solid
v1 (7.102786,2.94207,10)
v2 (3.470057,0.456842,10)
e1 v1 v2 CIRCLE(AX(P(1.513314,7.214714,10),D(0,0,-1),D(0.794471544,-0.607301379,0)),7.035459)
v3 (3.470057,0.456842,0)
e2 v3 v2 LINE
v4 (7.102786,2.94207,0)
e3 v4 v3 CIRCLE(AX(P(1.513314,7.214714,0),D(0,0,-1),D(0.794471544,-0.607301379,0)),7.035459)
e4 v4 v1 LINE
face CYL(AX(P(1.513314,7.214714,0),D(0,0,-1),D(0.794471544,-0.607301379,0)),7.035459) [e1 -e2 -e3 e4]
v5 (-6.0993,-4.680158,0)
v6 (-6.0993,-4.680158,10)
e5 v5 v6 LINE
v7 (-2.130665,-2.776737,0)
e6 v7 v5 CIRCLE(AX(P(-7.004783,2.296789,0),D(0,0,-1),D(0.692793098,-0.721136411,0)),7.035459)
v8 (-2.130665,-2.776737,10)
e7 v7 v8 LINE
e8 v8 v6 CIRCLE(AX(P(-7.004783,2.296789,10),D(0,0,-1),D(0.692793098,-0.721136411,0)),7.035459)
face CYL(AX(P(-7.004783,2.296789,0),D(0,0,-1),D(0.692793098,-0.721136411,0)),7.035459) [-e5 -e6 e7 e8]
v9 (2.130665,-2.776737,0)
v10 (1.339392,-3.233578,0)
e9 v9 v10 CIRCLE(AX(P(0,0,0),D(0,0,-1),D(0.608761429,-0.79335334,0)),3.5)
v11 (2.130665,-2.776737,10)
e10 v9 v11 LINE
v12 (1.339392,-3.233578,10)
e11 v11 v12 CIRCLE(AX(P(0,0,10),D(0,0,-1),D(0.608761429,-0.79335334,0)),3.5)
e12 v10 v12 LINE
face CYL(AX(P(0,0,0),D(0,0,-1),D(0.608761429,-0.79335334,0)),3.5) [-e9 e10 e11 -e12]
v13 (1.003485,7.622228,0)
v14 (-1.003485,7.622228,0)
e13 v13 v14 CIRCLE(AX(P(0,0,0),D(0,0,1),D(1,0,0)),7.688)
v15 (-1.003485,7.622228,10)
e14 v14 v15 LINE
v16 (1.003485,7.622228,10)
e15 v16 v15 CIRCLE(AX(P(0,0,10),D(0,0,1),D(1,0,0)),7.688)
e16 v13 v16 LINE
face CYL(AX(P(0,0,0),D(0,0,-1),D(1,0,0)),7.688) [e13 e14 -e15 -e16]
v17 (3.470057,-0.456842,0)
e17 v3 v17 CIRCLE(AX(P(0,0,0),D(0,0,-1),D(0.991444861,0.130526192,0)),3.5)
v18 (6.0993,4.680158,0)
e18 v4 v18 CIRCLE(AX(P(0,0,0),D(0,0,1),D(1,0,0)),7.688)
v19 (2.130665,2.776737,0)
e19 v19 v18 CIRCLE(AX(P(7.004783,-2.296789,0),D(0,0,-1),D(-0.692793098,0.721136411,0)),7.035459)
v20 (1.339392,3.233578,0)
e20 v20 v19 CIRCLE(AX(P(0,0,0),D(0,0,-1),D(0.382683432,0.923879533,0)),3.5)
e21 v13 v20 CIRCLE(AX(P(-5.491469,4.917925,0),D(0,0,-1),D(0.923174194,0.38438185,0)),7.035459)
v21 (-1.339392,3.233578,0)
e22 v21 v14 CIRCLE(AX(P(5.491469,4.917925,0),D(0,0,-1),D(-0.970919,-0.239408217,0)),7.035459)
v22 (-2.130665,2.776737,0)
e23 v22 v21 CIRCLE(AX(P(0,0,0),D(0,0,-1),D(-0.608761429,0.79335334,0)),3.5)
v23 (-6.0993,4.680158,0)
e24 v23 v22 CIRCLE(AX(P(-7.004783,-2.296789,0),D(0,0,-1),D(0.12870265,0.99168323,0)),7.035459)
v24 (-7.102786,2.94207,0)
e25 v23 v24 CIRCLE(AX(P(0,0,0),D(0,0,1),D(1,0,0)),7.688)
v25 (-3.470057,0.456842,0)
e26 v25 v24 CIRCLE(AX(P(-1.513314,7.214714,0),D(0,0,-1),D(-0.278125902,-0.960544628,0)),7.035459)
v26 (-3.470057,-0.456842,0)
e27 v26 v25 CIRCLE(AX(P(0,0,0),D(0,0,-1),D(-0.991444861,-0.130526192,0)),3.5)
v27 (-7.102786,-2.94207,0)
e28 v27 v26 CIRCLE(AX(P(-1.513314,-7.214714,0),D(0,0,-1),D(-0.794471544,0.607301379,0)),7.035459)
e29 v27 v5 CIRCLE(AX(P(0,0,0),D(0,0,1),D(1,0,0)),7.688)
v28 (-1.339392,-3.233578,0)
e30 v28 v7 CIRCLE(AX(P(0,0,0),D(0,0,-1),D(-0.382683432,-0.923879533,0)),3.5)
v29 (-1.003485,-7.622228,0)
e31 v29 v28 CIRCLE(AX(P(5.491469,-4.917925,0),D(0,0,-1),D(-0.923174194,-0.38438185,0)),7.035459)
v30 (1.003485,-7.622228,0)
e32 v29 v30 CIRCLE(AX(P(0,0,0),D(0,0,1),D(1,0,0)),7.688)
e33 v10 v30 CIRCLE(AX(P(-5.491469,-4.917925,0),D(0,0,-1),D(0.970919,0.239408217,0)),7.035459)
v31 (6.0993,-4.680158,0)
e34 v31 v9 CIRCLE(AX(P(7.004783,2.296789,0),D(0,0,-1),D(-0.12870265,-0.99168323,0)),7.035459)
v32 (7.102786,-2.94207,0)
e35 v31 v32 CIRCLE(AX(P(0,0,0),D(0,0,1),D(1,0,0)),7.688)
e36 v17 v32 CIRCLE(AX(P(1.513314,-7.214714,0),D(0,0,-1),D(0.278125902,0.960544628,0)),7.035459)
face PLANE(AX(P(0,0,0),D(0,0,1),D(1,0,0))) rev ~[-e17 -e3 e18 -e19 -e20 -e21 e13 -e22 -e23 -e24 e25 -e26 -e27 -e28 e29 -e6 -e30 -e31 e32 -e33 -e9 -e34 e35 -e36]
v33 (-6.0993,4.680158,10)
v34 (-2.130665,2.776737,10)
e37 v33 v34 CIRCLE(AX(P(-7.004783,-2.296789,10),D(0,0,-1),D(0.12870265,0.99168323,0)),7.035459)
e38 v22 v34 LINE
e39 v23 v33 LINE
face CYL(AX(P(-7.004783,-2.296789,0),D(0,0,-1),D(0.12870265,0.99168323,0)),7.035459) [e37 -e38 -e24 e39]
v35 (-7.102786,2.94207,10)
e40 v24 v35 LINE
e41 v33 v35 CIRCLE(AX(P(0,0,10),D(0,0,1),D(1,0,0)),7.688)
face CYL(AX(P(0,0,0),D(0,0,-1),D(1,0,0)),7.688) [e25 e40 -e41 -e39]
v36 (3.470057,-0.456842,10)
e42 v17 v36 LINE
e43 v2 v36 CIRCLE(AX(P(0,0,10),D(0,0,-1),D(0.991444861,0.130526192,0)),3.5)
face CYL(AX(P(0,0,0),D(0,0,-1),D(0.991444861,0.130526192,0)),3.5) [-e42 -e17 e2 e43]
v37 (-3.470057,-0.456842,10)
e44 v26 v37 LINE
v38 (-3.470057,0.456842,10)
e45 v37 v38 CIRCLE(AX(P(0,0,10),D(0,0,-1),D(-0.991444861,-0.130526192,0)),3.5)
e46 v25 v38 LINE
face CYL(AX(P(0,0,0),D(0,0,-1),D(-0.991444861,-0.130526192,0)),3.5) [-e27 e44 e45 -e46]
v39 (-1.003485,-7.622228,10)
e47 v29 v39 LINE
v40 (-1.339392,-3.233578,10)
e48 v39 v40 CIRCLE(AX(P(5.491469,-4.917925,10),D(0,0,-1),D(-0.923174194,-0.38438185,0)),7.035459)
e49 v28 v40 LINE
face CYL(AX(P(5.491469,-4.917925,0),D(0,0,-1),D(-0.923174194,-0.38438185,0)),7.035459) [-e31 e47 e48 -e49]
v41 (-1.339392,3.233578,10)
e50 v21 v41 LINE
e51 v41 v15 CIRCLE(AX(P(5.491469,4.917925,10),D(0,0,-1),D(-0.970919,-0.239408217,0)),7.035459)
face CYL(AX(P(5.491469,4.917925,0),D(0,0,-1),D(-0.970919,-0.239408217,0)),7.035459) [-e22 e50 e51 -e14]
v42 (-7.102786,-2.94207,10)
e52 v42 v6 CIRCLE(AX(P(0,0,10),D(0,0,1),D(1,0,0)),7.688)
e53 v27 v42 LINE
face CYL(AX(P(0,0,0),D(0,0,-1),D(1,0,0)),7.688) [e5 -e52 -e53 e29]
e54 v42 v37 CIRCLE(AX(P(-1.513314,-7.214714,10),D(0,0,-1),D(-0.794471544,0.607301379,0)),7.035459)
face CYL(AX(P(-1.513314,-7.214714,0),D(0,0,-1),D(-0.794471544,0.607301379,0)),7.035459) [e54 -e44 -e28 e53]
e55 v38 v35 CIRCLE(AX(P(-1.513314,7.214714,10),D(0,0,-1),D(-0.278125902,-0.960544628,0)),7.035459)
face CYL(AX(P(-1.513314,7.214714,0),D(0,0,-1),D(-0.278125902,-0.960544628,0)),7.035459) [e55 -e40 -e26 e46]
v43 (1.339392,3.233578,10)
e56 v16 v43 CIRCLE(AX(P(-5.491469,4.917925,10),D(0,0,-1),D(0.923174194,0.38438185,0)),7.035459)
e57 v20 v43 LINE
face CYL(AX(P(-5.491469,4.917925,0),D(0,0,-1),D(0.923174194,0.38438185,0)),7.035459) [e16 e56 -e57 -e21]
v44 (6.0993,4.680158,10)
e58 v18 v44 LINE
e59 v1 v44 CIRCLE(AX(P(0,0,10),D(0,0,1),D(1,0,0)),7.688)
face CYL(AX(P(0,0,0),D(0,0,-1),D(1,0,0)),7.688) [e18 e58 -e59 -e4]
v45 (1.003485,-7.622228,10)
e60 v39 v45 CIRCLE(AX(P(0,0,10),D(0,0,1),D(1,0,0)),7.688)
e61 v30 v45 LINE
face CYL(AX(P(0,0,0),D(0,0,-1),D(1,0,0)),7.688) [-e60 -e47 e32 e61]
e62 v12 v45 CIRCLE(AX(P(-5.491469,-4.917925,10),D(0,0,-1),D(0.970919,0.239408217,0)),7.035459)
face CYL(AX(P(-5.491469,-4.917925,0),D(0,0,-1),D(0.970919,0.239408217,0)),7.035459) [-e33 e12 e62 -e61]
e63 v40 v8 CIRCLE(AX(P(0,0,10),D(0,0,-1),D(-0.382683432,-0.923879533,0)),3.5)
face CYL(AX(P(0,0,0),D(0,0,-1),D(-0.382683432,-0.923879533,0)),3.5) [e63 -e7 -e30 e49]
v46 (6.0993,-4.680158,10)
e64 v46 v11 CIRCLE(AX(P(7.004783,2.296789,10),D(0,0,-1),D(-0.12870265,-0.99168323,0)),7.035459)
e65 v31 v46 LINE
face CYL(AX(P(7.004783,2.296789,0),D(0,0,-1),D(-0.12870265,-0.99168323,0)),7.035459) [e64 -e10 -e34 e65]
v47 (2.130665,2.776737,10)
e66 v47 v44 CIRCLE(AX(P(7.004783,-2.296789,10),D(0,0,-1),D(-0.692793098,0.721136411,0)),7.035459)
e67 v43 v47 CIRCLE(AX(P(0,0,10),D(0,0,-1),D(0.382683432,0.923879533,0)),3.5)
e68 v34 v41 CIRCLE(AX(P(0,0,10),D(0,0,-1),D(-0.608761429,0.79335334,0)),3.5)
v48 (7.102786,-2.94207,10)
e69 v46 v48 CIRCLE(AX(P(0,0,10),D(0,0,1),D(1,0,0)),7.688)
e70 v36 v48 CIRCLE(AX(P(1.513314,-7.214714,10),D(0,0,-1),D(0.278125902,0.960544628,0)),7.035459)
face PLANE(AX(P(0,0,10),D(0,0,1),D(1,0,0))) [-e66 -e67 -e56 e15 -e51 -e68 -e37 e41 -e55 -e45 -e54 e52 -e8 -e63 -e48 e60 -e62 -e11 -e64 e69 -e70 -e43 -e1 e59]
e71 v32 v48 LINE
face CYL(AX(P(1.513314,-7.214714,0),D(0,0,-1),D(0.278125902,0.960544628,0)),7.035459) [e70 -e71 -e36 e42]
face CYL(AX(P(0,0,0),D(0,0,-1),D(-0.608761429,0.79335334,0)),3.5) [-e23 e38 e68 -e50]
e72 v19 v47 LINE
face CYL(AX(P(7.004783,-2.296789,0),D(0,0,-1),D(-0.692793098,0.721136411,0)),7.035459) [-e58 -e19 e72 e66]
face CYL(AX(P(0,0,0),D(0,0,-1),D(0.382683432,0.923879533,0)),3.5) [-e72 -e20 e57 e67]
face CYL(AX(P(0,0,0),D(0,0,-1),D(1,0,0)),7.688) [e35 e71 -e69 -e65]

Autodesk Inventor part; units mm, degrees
sketch "Sketch1" plane through (0, 0, 0) normal (0, 0, 1) x (1, 0, 0)
  circle A0 centre (0, 0) radius 7.688
  dimension "d0" = 15.376
extrude "Extrusion1" add sketch "Sketch1" along normal blind 10
ref_plane "Work Plane2" through (0, 0, 5) normal (0, 0, 1) x (1, 0, 0)
sketch "Sketch2" plane through (0, 0, 0) normal (0, 0, -1) x (-1, 0, 0)
  circle A0 centre (0, 0) radius 7.688 projected
  circle A1 centre (0, 0) radius 6
  dimension "d3" = 12
surface extrude "Pitch Diameter" sketch "Sketch2" against normal through all shown no curves A1
ref_plane "Work Plane8" through (0, 0, 0) normal (0.8660254, 0.5, 0) x (0, 0, 1)
ref_plane "Work Plane9" through (0, 0, 0) normal (1, 0, 0) x (0, 1, 0)
spur gear teeth "Spur Gear" teeth 6 pitch diameter 12 tip diameter 15.376 root diameter 7 face width 10 start plane through (0, 0, 0) normal (0, 0, -1) x (-1, 0, 0)
equation "\"d0\" = da_da"
equation "\"d1\" = da_b"
equation "\"d3\" = da_d"
equation "\"da_da\" = 15.376043"
equation "\"da_b\" = 10"
equation "\"da_d\" = 12"
properties part number "Spur Gear1" material "Steel"
